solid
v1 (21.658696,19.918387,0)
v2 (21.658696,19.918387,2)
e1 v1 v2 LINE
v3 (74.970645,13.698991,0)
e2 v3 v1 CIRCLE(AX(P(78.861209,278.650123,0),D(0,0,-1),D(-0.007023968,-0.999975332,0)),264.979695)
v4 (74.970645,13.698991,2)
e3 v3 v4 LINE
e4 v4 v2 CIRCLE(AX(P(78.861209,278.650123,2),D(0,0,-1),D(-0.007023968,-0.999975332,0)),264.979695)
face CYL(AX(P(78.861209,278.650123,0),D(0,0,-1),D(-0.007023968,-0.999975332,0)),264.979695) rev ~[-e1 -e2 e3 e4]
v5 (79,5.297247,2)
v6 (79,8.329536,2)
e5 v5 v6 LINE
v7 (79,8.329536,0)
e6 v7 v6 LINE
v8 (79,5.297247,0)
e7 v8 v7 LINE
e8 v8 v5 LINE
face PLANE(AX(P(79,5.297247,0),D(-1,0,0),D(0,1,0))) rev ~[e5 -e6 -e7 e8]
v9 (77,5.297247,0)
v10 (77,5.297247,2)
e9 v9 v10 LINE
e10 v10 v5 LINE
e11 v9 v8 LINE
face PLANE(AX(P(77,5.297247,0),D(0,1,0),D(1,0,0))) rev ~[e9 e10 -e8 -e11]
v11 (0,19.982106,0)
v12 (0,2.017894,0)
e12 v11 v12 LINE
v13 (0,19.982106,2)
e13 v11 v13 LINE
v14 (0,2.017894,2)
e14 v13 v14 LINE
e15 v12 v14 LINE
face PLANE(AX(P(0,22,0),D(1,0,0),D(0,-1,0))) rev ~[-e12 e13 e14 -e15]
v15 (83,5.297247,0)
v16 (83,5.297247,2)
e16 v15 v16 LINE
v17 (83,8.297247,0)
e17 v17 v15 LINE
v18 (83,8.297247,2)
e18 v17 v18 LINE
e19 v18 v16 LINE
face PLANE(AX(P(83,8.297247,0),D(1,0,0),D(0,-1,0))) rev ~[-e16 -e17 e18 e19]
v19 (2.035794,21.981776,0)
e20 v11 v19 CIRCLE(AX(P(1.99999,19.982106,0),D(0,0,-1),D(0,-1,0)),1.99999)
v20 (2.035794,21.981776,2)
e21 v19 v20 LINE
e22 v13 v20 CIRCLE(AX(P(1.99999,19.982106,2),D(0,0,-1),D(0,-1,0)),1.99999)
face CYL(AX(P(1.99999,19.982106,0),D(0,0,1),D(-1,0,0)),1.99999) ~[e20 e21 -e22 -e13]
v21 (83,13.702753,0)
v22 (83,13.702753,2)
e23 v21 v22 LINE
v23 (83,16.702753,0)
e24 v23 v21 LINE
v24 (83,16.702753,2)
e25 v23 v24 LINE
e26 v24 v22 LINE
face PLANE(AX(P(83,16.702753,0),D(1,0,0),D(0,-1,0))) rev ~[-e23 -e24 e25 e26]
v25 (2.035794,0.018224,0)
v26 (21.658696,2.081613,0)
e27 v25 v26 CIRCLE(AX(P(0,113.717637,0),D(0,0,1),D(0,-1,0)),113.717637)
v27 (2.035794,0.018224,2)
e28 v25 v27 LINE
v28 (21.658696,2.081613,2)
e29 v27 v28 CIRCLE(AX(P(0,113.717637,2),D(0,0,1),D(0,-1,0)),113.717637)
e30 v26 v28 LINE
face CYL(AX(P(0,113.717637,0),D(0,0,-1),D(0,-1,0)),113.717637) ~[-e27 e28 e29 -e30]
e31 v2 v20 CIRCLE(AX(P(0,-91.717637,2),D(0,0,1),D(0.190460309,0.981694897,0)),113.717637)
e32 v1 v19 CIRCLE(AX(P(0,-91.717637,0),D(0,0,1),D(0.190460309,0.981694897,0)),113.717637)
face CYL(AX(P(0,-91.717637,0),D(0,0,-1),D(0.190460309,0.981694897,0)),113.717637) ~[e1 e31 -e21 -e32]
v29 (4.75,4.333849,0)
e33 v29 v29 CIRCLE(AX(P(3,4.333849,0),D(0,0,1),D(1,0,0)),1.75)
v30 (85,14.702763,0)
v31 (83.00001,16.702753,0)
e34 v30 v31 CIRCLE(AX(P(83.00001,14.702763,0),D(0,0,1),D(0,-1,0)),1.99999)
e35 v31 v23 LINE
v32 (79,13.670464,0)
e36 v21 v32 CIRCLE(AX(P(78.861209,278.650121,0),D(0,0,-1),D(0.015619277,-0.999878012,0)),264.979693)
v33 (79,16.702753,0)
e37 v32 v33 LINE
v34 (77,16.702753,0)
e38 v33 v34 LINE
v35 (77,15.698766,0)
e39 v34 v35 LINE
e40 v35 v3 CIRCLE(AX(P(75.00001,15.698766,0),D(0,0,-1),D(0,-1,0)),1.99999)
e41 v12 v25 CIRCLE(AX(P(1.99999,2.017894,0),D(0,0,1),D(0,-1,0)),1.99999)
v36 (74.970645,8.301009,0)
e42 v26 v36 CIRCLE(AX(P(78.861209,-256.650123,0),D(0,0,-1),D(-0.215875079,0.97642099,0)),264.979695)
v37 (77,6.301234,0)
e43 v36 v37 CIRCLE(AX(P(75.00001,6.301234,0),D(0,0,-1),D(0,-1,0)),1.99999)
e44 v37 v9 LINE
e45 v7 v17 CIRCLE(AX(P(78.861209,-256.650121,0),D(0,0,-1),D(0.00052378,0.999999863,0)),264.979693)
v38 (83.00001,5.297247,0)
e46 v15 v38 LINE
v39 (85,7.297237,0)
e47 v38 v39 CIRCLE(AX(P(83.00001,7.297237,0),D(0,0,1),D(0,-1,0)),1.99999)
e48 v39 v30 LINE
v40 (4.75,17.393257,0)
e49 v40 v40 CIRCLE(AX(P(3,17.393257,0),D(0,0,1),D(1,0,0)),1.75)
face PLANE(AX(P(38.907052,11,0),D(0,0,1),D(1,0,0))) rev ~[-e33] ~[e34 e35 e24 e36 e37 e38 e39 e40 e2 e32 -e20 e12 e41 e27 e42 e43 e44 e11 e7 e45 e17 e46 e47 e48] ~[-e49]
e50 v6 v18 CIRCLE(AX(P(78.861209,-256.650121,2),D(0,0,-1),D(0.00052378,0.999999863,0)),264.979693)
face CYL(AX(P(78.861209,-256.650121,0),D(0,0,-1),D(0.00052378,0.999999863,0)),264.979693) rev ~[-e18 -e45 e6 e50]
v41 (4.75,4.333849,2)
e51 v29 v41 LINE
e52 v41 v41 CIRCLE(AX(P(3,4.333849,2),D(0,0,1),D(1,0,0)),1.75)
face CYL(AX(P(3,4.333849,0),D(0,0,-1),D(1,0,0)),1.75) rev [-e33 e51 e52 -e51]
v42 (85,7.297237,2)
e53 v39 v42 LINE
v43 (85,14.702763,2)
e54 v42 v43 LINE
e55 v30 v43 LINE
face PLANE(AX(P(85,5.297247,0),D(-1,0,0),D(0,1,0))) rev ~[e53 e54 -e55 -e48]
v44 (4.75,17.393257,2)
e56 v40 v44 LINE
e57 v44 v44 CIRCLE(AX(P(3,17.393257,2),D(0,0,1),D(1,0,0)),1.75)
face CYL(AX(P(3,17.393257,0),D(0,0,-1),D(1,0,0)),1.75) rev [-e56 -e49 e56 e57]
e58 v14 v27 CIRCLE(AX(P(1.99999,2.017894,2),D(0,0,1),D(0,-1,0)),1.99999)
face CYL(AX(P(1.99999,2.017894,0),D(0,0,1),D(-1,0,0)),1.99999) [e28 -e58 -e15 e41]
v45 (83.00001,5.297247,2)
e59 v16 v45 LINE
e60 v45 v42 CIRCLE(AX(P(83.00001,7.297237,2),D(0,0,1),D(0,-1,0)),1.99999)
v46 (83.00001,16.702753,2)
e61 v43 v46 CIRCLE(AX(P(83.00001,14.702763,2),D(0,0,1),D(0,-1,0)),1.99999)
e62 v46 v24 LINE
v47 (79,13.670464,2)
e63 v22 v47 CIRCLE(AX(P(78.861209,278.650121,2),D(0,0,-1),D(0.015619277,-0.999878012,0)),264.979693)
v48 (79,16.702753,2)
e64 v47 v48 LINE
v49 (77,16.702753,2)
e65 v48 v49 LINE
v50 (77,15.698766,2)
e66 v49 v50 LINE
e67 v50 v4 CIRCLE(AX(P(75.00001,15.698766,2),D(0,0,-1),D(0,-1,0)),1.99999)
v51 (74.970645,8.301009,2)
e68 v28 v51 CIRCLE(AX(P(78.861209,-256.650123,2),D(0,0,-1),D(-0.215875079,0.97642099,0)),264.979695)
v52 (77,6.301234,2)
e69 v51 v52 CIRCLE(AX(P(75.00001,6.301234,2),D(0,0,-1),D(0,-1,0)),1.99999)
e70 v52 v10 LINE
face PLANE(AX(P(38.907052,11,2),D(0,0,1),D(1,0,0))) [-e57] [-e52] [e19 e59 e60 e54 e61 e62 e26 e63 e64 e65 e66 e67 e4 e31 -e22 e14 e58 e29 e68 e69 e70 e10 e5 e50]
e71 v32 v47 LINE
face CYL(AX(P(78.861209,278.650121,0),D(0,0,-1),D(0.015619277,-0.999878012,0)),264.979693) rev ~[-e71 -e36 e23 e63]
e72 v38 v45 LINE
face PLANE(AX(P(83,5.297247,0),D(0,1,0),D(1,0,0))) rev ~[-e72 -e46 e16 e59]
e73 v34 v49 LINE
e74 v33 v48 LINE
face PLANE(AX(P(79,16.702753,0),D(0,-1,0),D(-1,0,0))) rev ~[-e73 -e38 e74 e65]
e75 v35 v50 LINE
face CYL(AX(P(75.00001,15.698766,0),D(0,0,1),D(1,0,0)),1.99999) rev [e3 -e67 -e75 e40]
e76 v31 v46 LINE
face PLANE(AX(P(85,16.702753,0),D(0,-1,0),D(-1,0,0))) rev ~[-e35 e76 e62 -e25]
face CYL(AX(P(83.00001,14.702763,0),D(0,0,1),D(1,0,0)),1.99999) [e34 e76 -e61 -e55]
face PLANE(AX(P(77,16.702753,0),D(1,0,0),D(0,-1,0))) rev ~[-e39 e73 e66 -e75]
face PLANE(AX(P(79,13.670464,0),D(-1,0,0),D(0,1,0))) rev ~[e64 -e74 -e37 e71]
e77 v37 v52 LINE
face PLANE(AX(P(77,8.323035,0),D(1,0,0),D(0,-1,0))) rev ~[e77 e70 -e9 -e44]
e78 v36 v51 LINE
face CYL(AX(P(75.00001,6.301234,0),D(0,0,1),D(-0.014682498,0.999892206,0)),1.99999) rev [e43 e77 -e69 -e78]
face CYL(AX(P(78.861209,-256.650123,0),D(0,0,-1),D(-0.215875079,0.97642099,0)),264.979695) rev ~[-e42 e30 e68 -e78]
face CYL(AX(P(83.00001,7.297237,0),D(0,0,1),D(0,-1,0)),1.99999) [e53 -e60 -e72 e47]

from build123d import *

# Parameters (mm, degrees)
F0_R     = 1.75
F1_DEPTH = 2
F2_R     = 1.99999


# Not quite as in the source:
# - a fillet or chamfer is up to 0.001 mm smaller than in the source, because OpenCascade refuses the exact size


with BuildPart() as f1:
    # F0 (on Top) → F1 (new body)
    with BuildSketch(Plane.XY):
        with BuildLine():
            Line((0, 22), (0, 0))
            ThreePointArc((0, 0), (10.8792490031, 0.5215994991), (21.6586962342, 2.0816130564))
            ThreePointArc((21.6586962342, 2.0816130564), (49.1649189112, 6.6602813892), (77, 8.3230352611))
            ThreePointArc((77, 8.3230352611), (77.9999938672, 8.3281723489), (79, 8.3295355292))
            ThreePointArc((79, 8.3295355292), (81.0000609284, 8.3209395881), (83, 8.2972474438))
            ThreePointArc((83, 8.2972474438), (84.0000366078, 8.2797378058), (85, 8.2584535703))
            Line((85, 8.2584535703), (85, 13.7415464297))
            ThreePointArc((85, 13.7415464297), (84.0000366078, 13.7202621942), (83, 13.7027525562))
            ThreePointArc((83, 13.7027525562), (81.0000609284, 13.6790604119), (79, 13.6704644708))
            ThreePointArc((79, 13.6704644708), (77.9999938672, 13.6718276511), (77, 13.6769647389))
            ThreePointArc((77, 13.6769647389), (49.1649189112, 15.3397186108), (21.6586962342, 19.9183869436))
            ThreePointArc((21.6586962342, 19.9183869436), (10.8792490031, 21.4784005009), (0, 22))
        make_face()
        with Locations((3, 4.3338485993)):
            Circle(F0_R, mode=Mode.SUBTRACT)
        with Locations((3, 17.3932574689)):
            Circle(F0_R, mode=Mode.SUBTRACT)
        with BuildLine():
            ThreePointArc((79, 8.3295355292), (77.9999938672, 8.3281723489), (77, 8.3230352611))
            Line((77, 8.3230352611), (77, 5.2972474438))
            Line((77, 5.2972474438), (79, 5.2972474438))
            Line((79, 5.2972474438), (79, 8.3295355292))
        make_face()
        with BuildLine():
            Line((83, 5.2972474438), (85, 5.2972474438))
            Line((85, 5.2972474438), (85, 8.2584535703))
            ThreePointArc((85, 8.2584535703), (84.0000366078, 8.2797378058), (83, 8.2972474438))
            Line((83, 8.2972474438), (83, 5.2972474438))
        make_face()
        with BuildLine():
            Line((77, 16.7027525562), (77, 13.6769647389))
            ThreePointArc((77, 13.6769647389), (77.9999938672, 13.6718276511), (79, 13.6704644708))
            Line((79, 13.6704644708), (79, 16.7027525562))
            Line((79, 16.7027525562), (77, 16.7027525562))
        make_face()
        with BuildLine():
            Line((85, 13.7415464297), (85, 16.7027525562))
            Line((85, 16.7027525562), (83, 16.7027525562))
            Line((83, 16.7027525562), (83, 13.7027525562))
            ThreePointArc((83, 13.7027525562), (84.0000366078, 13.7202621942), (85, 13.7415464297))
        make_face()
    extrude(amount=F1_DEPTH)

    # F2 (radius 2 in the source; OpenCascade refuses exactly that, so slightly less here)
    f2_edges = [f1.edges().sort_by_distance(p)[0] for p in [
        (0, 0, 1),
        (0, 22, 1),
        (85, 5.297247, 1),
        (85, 16.702753, 1),
        (77, 8.323035, 1),
        (77, 13.676965, 1),
    ]]
    fillet(f2_edges, radius=F2_R)


solid = f1.part
